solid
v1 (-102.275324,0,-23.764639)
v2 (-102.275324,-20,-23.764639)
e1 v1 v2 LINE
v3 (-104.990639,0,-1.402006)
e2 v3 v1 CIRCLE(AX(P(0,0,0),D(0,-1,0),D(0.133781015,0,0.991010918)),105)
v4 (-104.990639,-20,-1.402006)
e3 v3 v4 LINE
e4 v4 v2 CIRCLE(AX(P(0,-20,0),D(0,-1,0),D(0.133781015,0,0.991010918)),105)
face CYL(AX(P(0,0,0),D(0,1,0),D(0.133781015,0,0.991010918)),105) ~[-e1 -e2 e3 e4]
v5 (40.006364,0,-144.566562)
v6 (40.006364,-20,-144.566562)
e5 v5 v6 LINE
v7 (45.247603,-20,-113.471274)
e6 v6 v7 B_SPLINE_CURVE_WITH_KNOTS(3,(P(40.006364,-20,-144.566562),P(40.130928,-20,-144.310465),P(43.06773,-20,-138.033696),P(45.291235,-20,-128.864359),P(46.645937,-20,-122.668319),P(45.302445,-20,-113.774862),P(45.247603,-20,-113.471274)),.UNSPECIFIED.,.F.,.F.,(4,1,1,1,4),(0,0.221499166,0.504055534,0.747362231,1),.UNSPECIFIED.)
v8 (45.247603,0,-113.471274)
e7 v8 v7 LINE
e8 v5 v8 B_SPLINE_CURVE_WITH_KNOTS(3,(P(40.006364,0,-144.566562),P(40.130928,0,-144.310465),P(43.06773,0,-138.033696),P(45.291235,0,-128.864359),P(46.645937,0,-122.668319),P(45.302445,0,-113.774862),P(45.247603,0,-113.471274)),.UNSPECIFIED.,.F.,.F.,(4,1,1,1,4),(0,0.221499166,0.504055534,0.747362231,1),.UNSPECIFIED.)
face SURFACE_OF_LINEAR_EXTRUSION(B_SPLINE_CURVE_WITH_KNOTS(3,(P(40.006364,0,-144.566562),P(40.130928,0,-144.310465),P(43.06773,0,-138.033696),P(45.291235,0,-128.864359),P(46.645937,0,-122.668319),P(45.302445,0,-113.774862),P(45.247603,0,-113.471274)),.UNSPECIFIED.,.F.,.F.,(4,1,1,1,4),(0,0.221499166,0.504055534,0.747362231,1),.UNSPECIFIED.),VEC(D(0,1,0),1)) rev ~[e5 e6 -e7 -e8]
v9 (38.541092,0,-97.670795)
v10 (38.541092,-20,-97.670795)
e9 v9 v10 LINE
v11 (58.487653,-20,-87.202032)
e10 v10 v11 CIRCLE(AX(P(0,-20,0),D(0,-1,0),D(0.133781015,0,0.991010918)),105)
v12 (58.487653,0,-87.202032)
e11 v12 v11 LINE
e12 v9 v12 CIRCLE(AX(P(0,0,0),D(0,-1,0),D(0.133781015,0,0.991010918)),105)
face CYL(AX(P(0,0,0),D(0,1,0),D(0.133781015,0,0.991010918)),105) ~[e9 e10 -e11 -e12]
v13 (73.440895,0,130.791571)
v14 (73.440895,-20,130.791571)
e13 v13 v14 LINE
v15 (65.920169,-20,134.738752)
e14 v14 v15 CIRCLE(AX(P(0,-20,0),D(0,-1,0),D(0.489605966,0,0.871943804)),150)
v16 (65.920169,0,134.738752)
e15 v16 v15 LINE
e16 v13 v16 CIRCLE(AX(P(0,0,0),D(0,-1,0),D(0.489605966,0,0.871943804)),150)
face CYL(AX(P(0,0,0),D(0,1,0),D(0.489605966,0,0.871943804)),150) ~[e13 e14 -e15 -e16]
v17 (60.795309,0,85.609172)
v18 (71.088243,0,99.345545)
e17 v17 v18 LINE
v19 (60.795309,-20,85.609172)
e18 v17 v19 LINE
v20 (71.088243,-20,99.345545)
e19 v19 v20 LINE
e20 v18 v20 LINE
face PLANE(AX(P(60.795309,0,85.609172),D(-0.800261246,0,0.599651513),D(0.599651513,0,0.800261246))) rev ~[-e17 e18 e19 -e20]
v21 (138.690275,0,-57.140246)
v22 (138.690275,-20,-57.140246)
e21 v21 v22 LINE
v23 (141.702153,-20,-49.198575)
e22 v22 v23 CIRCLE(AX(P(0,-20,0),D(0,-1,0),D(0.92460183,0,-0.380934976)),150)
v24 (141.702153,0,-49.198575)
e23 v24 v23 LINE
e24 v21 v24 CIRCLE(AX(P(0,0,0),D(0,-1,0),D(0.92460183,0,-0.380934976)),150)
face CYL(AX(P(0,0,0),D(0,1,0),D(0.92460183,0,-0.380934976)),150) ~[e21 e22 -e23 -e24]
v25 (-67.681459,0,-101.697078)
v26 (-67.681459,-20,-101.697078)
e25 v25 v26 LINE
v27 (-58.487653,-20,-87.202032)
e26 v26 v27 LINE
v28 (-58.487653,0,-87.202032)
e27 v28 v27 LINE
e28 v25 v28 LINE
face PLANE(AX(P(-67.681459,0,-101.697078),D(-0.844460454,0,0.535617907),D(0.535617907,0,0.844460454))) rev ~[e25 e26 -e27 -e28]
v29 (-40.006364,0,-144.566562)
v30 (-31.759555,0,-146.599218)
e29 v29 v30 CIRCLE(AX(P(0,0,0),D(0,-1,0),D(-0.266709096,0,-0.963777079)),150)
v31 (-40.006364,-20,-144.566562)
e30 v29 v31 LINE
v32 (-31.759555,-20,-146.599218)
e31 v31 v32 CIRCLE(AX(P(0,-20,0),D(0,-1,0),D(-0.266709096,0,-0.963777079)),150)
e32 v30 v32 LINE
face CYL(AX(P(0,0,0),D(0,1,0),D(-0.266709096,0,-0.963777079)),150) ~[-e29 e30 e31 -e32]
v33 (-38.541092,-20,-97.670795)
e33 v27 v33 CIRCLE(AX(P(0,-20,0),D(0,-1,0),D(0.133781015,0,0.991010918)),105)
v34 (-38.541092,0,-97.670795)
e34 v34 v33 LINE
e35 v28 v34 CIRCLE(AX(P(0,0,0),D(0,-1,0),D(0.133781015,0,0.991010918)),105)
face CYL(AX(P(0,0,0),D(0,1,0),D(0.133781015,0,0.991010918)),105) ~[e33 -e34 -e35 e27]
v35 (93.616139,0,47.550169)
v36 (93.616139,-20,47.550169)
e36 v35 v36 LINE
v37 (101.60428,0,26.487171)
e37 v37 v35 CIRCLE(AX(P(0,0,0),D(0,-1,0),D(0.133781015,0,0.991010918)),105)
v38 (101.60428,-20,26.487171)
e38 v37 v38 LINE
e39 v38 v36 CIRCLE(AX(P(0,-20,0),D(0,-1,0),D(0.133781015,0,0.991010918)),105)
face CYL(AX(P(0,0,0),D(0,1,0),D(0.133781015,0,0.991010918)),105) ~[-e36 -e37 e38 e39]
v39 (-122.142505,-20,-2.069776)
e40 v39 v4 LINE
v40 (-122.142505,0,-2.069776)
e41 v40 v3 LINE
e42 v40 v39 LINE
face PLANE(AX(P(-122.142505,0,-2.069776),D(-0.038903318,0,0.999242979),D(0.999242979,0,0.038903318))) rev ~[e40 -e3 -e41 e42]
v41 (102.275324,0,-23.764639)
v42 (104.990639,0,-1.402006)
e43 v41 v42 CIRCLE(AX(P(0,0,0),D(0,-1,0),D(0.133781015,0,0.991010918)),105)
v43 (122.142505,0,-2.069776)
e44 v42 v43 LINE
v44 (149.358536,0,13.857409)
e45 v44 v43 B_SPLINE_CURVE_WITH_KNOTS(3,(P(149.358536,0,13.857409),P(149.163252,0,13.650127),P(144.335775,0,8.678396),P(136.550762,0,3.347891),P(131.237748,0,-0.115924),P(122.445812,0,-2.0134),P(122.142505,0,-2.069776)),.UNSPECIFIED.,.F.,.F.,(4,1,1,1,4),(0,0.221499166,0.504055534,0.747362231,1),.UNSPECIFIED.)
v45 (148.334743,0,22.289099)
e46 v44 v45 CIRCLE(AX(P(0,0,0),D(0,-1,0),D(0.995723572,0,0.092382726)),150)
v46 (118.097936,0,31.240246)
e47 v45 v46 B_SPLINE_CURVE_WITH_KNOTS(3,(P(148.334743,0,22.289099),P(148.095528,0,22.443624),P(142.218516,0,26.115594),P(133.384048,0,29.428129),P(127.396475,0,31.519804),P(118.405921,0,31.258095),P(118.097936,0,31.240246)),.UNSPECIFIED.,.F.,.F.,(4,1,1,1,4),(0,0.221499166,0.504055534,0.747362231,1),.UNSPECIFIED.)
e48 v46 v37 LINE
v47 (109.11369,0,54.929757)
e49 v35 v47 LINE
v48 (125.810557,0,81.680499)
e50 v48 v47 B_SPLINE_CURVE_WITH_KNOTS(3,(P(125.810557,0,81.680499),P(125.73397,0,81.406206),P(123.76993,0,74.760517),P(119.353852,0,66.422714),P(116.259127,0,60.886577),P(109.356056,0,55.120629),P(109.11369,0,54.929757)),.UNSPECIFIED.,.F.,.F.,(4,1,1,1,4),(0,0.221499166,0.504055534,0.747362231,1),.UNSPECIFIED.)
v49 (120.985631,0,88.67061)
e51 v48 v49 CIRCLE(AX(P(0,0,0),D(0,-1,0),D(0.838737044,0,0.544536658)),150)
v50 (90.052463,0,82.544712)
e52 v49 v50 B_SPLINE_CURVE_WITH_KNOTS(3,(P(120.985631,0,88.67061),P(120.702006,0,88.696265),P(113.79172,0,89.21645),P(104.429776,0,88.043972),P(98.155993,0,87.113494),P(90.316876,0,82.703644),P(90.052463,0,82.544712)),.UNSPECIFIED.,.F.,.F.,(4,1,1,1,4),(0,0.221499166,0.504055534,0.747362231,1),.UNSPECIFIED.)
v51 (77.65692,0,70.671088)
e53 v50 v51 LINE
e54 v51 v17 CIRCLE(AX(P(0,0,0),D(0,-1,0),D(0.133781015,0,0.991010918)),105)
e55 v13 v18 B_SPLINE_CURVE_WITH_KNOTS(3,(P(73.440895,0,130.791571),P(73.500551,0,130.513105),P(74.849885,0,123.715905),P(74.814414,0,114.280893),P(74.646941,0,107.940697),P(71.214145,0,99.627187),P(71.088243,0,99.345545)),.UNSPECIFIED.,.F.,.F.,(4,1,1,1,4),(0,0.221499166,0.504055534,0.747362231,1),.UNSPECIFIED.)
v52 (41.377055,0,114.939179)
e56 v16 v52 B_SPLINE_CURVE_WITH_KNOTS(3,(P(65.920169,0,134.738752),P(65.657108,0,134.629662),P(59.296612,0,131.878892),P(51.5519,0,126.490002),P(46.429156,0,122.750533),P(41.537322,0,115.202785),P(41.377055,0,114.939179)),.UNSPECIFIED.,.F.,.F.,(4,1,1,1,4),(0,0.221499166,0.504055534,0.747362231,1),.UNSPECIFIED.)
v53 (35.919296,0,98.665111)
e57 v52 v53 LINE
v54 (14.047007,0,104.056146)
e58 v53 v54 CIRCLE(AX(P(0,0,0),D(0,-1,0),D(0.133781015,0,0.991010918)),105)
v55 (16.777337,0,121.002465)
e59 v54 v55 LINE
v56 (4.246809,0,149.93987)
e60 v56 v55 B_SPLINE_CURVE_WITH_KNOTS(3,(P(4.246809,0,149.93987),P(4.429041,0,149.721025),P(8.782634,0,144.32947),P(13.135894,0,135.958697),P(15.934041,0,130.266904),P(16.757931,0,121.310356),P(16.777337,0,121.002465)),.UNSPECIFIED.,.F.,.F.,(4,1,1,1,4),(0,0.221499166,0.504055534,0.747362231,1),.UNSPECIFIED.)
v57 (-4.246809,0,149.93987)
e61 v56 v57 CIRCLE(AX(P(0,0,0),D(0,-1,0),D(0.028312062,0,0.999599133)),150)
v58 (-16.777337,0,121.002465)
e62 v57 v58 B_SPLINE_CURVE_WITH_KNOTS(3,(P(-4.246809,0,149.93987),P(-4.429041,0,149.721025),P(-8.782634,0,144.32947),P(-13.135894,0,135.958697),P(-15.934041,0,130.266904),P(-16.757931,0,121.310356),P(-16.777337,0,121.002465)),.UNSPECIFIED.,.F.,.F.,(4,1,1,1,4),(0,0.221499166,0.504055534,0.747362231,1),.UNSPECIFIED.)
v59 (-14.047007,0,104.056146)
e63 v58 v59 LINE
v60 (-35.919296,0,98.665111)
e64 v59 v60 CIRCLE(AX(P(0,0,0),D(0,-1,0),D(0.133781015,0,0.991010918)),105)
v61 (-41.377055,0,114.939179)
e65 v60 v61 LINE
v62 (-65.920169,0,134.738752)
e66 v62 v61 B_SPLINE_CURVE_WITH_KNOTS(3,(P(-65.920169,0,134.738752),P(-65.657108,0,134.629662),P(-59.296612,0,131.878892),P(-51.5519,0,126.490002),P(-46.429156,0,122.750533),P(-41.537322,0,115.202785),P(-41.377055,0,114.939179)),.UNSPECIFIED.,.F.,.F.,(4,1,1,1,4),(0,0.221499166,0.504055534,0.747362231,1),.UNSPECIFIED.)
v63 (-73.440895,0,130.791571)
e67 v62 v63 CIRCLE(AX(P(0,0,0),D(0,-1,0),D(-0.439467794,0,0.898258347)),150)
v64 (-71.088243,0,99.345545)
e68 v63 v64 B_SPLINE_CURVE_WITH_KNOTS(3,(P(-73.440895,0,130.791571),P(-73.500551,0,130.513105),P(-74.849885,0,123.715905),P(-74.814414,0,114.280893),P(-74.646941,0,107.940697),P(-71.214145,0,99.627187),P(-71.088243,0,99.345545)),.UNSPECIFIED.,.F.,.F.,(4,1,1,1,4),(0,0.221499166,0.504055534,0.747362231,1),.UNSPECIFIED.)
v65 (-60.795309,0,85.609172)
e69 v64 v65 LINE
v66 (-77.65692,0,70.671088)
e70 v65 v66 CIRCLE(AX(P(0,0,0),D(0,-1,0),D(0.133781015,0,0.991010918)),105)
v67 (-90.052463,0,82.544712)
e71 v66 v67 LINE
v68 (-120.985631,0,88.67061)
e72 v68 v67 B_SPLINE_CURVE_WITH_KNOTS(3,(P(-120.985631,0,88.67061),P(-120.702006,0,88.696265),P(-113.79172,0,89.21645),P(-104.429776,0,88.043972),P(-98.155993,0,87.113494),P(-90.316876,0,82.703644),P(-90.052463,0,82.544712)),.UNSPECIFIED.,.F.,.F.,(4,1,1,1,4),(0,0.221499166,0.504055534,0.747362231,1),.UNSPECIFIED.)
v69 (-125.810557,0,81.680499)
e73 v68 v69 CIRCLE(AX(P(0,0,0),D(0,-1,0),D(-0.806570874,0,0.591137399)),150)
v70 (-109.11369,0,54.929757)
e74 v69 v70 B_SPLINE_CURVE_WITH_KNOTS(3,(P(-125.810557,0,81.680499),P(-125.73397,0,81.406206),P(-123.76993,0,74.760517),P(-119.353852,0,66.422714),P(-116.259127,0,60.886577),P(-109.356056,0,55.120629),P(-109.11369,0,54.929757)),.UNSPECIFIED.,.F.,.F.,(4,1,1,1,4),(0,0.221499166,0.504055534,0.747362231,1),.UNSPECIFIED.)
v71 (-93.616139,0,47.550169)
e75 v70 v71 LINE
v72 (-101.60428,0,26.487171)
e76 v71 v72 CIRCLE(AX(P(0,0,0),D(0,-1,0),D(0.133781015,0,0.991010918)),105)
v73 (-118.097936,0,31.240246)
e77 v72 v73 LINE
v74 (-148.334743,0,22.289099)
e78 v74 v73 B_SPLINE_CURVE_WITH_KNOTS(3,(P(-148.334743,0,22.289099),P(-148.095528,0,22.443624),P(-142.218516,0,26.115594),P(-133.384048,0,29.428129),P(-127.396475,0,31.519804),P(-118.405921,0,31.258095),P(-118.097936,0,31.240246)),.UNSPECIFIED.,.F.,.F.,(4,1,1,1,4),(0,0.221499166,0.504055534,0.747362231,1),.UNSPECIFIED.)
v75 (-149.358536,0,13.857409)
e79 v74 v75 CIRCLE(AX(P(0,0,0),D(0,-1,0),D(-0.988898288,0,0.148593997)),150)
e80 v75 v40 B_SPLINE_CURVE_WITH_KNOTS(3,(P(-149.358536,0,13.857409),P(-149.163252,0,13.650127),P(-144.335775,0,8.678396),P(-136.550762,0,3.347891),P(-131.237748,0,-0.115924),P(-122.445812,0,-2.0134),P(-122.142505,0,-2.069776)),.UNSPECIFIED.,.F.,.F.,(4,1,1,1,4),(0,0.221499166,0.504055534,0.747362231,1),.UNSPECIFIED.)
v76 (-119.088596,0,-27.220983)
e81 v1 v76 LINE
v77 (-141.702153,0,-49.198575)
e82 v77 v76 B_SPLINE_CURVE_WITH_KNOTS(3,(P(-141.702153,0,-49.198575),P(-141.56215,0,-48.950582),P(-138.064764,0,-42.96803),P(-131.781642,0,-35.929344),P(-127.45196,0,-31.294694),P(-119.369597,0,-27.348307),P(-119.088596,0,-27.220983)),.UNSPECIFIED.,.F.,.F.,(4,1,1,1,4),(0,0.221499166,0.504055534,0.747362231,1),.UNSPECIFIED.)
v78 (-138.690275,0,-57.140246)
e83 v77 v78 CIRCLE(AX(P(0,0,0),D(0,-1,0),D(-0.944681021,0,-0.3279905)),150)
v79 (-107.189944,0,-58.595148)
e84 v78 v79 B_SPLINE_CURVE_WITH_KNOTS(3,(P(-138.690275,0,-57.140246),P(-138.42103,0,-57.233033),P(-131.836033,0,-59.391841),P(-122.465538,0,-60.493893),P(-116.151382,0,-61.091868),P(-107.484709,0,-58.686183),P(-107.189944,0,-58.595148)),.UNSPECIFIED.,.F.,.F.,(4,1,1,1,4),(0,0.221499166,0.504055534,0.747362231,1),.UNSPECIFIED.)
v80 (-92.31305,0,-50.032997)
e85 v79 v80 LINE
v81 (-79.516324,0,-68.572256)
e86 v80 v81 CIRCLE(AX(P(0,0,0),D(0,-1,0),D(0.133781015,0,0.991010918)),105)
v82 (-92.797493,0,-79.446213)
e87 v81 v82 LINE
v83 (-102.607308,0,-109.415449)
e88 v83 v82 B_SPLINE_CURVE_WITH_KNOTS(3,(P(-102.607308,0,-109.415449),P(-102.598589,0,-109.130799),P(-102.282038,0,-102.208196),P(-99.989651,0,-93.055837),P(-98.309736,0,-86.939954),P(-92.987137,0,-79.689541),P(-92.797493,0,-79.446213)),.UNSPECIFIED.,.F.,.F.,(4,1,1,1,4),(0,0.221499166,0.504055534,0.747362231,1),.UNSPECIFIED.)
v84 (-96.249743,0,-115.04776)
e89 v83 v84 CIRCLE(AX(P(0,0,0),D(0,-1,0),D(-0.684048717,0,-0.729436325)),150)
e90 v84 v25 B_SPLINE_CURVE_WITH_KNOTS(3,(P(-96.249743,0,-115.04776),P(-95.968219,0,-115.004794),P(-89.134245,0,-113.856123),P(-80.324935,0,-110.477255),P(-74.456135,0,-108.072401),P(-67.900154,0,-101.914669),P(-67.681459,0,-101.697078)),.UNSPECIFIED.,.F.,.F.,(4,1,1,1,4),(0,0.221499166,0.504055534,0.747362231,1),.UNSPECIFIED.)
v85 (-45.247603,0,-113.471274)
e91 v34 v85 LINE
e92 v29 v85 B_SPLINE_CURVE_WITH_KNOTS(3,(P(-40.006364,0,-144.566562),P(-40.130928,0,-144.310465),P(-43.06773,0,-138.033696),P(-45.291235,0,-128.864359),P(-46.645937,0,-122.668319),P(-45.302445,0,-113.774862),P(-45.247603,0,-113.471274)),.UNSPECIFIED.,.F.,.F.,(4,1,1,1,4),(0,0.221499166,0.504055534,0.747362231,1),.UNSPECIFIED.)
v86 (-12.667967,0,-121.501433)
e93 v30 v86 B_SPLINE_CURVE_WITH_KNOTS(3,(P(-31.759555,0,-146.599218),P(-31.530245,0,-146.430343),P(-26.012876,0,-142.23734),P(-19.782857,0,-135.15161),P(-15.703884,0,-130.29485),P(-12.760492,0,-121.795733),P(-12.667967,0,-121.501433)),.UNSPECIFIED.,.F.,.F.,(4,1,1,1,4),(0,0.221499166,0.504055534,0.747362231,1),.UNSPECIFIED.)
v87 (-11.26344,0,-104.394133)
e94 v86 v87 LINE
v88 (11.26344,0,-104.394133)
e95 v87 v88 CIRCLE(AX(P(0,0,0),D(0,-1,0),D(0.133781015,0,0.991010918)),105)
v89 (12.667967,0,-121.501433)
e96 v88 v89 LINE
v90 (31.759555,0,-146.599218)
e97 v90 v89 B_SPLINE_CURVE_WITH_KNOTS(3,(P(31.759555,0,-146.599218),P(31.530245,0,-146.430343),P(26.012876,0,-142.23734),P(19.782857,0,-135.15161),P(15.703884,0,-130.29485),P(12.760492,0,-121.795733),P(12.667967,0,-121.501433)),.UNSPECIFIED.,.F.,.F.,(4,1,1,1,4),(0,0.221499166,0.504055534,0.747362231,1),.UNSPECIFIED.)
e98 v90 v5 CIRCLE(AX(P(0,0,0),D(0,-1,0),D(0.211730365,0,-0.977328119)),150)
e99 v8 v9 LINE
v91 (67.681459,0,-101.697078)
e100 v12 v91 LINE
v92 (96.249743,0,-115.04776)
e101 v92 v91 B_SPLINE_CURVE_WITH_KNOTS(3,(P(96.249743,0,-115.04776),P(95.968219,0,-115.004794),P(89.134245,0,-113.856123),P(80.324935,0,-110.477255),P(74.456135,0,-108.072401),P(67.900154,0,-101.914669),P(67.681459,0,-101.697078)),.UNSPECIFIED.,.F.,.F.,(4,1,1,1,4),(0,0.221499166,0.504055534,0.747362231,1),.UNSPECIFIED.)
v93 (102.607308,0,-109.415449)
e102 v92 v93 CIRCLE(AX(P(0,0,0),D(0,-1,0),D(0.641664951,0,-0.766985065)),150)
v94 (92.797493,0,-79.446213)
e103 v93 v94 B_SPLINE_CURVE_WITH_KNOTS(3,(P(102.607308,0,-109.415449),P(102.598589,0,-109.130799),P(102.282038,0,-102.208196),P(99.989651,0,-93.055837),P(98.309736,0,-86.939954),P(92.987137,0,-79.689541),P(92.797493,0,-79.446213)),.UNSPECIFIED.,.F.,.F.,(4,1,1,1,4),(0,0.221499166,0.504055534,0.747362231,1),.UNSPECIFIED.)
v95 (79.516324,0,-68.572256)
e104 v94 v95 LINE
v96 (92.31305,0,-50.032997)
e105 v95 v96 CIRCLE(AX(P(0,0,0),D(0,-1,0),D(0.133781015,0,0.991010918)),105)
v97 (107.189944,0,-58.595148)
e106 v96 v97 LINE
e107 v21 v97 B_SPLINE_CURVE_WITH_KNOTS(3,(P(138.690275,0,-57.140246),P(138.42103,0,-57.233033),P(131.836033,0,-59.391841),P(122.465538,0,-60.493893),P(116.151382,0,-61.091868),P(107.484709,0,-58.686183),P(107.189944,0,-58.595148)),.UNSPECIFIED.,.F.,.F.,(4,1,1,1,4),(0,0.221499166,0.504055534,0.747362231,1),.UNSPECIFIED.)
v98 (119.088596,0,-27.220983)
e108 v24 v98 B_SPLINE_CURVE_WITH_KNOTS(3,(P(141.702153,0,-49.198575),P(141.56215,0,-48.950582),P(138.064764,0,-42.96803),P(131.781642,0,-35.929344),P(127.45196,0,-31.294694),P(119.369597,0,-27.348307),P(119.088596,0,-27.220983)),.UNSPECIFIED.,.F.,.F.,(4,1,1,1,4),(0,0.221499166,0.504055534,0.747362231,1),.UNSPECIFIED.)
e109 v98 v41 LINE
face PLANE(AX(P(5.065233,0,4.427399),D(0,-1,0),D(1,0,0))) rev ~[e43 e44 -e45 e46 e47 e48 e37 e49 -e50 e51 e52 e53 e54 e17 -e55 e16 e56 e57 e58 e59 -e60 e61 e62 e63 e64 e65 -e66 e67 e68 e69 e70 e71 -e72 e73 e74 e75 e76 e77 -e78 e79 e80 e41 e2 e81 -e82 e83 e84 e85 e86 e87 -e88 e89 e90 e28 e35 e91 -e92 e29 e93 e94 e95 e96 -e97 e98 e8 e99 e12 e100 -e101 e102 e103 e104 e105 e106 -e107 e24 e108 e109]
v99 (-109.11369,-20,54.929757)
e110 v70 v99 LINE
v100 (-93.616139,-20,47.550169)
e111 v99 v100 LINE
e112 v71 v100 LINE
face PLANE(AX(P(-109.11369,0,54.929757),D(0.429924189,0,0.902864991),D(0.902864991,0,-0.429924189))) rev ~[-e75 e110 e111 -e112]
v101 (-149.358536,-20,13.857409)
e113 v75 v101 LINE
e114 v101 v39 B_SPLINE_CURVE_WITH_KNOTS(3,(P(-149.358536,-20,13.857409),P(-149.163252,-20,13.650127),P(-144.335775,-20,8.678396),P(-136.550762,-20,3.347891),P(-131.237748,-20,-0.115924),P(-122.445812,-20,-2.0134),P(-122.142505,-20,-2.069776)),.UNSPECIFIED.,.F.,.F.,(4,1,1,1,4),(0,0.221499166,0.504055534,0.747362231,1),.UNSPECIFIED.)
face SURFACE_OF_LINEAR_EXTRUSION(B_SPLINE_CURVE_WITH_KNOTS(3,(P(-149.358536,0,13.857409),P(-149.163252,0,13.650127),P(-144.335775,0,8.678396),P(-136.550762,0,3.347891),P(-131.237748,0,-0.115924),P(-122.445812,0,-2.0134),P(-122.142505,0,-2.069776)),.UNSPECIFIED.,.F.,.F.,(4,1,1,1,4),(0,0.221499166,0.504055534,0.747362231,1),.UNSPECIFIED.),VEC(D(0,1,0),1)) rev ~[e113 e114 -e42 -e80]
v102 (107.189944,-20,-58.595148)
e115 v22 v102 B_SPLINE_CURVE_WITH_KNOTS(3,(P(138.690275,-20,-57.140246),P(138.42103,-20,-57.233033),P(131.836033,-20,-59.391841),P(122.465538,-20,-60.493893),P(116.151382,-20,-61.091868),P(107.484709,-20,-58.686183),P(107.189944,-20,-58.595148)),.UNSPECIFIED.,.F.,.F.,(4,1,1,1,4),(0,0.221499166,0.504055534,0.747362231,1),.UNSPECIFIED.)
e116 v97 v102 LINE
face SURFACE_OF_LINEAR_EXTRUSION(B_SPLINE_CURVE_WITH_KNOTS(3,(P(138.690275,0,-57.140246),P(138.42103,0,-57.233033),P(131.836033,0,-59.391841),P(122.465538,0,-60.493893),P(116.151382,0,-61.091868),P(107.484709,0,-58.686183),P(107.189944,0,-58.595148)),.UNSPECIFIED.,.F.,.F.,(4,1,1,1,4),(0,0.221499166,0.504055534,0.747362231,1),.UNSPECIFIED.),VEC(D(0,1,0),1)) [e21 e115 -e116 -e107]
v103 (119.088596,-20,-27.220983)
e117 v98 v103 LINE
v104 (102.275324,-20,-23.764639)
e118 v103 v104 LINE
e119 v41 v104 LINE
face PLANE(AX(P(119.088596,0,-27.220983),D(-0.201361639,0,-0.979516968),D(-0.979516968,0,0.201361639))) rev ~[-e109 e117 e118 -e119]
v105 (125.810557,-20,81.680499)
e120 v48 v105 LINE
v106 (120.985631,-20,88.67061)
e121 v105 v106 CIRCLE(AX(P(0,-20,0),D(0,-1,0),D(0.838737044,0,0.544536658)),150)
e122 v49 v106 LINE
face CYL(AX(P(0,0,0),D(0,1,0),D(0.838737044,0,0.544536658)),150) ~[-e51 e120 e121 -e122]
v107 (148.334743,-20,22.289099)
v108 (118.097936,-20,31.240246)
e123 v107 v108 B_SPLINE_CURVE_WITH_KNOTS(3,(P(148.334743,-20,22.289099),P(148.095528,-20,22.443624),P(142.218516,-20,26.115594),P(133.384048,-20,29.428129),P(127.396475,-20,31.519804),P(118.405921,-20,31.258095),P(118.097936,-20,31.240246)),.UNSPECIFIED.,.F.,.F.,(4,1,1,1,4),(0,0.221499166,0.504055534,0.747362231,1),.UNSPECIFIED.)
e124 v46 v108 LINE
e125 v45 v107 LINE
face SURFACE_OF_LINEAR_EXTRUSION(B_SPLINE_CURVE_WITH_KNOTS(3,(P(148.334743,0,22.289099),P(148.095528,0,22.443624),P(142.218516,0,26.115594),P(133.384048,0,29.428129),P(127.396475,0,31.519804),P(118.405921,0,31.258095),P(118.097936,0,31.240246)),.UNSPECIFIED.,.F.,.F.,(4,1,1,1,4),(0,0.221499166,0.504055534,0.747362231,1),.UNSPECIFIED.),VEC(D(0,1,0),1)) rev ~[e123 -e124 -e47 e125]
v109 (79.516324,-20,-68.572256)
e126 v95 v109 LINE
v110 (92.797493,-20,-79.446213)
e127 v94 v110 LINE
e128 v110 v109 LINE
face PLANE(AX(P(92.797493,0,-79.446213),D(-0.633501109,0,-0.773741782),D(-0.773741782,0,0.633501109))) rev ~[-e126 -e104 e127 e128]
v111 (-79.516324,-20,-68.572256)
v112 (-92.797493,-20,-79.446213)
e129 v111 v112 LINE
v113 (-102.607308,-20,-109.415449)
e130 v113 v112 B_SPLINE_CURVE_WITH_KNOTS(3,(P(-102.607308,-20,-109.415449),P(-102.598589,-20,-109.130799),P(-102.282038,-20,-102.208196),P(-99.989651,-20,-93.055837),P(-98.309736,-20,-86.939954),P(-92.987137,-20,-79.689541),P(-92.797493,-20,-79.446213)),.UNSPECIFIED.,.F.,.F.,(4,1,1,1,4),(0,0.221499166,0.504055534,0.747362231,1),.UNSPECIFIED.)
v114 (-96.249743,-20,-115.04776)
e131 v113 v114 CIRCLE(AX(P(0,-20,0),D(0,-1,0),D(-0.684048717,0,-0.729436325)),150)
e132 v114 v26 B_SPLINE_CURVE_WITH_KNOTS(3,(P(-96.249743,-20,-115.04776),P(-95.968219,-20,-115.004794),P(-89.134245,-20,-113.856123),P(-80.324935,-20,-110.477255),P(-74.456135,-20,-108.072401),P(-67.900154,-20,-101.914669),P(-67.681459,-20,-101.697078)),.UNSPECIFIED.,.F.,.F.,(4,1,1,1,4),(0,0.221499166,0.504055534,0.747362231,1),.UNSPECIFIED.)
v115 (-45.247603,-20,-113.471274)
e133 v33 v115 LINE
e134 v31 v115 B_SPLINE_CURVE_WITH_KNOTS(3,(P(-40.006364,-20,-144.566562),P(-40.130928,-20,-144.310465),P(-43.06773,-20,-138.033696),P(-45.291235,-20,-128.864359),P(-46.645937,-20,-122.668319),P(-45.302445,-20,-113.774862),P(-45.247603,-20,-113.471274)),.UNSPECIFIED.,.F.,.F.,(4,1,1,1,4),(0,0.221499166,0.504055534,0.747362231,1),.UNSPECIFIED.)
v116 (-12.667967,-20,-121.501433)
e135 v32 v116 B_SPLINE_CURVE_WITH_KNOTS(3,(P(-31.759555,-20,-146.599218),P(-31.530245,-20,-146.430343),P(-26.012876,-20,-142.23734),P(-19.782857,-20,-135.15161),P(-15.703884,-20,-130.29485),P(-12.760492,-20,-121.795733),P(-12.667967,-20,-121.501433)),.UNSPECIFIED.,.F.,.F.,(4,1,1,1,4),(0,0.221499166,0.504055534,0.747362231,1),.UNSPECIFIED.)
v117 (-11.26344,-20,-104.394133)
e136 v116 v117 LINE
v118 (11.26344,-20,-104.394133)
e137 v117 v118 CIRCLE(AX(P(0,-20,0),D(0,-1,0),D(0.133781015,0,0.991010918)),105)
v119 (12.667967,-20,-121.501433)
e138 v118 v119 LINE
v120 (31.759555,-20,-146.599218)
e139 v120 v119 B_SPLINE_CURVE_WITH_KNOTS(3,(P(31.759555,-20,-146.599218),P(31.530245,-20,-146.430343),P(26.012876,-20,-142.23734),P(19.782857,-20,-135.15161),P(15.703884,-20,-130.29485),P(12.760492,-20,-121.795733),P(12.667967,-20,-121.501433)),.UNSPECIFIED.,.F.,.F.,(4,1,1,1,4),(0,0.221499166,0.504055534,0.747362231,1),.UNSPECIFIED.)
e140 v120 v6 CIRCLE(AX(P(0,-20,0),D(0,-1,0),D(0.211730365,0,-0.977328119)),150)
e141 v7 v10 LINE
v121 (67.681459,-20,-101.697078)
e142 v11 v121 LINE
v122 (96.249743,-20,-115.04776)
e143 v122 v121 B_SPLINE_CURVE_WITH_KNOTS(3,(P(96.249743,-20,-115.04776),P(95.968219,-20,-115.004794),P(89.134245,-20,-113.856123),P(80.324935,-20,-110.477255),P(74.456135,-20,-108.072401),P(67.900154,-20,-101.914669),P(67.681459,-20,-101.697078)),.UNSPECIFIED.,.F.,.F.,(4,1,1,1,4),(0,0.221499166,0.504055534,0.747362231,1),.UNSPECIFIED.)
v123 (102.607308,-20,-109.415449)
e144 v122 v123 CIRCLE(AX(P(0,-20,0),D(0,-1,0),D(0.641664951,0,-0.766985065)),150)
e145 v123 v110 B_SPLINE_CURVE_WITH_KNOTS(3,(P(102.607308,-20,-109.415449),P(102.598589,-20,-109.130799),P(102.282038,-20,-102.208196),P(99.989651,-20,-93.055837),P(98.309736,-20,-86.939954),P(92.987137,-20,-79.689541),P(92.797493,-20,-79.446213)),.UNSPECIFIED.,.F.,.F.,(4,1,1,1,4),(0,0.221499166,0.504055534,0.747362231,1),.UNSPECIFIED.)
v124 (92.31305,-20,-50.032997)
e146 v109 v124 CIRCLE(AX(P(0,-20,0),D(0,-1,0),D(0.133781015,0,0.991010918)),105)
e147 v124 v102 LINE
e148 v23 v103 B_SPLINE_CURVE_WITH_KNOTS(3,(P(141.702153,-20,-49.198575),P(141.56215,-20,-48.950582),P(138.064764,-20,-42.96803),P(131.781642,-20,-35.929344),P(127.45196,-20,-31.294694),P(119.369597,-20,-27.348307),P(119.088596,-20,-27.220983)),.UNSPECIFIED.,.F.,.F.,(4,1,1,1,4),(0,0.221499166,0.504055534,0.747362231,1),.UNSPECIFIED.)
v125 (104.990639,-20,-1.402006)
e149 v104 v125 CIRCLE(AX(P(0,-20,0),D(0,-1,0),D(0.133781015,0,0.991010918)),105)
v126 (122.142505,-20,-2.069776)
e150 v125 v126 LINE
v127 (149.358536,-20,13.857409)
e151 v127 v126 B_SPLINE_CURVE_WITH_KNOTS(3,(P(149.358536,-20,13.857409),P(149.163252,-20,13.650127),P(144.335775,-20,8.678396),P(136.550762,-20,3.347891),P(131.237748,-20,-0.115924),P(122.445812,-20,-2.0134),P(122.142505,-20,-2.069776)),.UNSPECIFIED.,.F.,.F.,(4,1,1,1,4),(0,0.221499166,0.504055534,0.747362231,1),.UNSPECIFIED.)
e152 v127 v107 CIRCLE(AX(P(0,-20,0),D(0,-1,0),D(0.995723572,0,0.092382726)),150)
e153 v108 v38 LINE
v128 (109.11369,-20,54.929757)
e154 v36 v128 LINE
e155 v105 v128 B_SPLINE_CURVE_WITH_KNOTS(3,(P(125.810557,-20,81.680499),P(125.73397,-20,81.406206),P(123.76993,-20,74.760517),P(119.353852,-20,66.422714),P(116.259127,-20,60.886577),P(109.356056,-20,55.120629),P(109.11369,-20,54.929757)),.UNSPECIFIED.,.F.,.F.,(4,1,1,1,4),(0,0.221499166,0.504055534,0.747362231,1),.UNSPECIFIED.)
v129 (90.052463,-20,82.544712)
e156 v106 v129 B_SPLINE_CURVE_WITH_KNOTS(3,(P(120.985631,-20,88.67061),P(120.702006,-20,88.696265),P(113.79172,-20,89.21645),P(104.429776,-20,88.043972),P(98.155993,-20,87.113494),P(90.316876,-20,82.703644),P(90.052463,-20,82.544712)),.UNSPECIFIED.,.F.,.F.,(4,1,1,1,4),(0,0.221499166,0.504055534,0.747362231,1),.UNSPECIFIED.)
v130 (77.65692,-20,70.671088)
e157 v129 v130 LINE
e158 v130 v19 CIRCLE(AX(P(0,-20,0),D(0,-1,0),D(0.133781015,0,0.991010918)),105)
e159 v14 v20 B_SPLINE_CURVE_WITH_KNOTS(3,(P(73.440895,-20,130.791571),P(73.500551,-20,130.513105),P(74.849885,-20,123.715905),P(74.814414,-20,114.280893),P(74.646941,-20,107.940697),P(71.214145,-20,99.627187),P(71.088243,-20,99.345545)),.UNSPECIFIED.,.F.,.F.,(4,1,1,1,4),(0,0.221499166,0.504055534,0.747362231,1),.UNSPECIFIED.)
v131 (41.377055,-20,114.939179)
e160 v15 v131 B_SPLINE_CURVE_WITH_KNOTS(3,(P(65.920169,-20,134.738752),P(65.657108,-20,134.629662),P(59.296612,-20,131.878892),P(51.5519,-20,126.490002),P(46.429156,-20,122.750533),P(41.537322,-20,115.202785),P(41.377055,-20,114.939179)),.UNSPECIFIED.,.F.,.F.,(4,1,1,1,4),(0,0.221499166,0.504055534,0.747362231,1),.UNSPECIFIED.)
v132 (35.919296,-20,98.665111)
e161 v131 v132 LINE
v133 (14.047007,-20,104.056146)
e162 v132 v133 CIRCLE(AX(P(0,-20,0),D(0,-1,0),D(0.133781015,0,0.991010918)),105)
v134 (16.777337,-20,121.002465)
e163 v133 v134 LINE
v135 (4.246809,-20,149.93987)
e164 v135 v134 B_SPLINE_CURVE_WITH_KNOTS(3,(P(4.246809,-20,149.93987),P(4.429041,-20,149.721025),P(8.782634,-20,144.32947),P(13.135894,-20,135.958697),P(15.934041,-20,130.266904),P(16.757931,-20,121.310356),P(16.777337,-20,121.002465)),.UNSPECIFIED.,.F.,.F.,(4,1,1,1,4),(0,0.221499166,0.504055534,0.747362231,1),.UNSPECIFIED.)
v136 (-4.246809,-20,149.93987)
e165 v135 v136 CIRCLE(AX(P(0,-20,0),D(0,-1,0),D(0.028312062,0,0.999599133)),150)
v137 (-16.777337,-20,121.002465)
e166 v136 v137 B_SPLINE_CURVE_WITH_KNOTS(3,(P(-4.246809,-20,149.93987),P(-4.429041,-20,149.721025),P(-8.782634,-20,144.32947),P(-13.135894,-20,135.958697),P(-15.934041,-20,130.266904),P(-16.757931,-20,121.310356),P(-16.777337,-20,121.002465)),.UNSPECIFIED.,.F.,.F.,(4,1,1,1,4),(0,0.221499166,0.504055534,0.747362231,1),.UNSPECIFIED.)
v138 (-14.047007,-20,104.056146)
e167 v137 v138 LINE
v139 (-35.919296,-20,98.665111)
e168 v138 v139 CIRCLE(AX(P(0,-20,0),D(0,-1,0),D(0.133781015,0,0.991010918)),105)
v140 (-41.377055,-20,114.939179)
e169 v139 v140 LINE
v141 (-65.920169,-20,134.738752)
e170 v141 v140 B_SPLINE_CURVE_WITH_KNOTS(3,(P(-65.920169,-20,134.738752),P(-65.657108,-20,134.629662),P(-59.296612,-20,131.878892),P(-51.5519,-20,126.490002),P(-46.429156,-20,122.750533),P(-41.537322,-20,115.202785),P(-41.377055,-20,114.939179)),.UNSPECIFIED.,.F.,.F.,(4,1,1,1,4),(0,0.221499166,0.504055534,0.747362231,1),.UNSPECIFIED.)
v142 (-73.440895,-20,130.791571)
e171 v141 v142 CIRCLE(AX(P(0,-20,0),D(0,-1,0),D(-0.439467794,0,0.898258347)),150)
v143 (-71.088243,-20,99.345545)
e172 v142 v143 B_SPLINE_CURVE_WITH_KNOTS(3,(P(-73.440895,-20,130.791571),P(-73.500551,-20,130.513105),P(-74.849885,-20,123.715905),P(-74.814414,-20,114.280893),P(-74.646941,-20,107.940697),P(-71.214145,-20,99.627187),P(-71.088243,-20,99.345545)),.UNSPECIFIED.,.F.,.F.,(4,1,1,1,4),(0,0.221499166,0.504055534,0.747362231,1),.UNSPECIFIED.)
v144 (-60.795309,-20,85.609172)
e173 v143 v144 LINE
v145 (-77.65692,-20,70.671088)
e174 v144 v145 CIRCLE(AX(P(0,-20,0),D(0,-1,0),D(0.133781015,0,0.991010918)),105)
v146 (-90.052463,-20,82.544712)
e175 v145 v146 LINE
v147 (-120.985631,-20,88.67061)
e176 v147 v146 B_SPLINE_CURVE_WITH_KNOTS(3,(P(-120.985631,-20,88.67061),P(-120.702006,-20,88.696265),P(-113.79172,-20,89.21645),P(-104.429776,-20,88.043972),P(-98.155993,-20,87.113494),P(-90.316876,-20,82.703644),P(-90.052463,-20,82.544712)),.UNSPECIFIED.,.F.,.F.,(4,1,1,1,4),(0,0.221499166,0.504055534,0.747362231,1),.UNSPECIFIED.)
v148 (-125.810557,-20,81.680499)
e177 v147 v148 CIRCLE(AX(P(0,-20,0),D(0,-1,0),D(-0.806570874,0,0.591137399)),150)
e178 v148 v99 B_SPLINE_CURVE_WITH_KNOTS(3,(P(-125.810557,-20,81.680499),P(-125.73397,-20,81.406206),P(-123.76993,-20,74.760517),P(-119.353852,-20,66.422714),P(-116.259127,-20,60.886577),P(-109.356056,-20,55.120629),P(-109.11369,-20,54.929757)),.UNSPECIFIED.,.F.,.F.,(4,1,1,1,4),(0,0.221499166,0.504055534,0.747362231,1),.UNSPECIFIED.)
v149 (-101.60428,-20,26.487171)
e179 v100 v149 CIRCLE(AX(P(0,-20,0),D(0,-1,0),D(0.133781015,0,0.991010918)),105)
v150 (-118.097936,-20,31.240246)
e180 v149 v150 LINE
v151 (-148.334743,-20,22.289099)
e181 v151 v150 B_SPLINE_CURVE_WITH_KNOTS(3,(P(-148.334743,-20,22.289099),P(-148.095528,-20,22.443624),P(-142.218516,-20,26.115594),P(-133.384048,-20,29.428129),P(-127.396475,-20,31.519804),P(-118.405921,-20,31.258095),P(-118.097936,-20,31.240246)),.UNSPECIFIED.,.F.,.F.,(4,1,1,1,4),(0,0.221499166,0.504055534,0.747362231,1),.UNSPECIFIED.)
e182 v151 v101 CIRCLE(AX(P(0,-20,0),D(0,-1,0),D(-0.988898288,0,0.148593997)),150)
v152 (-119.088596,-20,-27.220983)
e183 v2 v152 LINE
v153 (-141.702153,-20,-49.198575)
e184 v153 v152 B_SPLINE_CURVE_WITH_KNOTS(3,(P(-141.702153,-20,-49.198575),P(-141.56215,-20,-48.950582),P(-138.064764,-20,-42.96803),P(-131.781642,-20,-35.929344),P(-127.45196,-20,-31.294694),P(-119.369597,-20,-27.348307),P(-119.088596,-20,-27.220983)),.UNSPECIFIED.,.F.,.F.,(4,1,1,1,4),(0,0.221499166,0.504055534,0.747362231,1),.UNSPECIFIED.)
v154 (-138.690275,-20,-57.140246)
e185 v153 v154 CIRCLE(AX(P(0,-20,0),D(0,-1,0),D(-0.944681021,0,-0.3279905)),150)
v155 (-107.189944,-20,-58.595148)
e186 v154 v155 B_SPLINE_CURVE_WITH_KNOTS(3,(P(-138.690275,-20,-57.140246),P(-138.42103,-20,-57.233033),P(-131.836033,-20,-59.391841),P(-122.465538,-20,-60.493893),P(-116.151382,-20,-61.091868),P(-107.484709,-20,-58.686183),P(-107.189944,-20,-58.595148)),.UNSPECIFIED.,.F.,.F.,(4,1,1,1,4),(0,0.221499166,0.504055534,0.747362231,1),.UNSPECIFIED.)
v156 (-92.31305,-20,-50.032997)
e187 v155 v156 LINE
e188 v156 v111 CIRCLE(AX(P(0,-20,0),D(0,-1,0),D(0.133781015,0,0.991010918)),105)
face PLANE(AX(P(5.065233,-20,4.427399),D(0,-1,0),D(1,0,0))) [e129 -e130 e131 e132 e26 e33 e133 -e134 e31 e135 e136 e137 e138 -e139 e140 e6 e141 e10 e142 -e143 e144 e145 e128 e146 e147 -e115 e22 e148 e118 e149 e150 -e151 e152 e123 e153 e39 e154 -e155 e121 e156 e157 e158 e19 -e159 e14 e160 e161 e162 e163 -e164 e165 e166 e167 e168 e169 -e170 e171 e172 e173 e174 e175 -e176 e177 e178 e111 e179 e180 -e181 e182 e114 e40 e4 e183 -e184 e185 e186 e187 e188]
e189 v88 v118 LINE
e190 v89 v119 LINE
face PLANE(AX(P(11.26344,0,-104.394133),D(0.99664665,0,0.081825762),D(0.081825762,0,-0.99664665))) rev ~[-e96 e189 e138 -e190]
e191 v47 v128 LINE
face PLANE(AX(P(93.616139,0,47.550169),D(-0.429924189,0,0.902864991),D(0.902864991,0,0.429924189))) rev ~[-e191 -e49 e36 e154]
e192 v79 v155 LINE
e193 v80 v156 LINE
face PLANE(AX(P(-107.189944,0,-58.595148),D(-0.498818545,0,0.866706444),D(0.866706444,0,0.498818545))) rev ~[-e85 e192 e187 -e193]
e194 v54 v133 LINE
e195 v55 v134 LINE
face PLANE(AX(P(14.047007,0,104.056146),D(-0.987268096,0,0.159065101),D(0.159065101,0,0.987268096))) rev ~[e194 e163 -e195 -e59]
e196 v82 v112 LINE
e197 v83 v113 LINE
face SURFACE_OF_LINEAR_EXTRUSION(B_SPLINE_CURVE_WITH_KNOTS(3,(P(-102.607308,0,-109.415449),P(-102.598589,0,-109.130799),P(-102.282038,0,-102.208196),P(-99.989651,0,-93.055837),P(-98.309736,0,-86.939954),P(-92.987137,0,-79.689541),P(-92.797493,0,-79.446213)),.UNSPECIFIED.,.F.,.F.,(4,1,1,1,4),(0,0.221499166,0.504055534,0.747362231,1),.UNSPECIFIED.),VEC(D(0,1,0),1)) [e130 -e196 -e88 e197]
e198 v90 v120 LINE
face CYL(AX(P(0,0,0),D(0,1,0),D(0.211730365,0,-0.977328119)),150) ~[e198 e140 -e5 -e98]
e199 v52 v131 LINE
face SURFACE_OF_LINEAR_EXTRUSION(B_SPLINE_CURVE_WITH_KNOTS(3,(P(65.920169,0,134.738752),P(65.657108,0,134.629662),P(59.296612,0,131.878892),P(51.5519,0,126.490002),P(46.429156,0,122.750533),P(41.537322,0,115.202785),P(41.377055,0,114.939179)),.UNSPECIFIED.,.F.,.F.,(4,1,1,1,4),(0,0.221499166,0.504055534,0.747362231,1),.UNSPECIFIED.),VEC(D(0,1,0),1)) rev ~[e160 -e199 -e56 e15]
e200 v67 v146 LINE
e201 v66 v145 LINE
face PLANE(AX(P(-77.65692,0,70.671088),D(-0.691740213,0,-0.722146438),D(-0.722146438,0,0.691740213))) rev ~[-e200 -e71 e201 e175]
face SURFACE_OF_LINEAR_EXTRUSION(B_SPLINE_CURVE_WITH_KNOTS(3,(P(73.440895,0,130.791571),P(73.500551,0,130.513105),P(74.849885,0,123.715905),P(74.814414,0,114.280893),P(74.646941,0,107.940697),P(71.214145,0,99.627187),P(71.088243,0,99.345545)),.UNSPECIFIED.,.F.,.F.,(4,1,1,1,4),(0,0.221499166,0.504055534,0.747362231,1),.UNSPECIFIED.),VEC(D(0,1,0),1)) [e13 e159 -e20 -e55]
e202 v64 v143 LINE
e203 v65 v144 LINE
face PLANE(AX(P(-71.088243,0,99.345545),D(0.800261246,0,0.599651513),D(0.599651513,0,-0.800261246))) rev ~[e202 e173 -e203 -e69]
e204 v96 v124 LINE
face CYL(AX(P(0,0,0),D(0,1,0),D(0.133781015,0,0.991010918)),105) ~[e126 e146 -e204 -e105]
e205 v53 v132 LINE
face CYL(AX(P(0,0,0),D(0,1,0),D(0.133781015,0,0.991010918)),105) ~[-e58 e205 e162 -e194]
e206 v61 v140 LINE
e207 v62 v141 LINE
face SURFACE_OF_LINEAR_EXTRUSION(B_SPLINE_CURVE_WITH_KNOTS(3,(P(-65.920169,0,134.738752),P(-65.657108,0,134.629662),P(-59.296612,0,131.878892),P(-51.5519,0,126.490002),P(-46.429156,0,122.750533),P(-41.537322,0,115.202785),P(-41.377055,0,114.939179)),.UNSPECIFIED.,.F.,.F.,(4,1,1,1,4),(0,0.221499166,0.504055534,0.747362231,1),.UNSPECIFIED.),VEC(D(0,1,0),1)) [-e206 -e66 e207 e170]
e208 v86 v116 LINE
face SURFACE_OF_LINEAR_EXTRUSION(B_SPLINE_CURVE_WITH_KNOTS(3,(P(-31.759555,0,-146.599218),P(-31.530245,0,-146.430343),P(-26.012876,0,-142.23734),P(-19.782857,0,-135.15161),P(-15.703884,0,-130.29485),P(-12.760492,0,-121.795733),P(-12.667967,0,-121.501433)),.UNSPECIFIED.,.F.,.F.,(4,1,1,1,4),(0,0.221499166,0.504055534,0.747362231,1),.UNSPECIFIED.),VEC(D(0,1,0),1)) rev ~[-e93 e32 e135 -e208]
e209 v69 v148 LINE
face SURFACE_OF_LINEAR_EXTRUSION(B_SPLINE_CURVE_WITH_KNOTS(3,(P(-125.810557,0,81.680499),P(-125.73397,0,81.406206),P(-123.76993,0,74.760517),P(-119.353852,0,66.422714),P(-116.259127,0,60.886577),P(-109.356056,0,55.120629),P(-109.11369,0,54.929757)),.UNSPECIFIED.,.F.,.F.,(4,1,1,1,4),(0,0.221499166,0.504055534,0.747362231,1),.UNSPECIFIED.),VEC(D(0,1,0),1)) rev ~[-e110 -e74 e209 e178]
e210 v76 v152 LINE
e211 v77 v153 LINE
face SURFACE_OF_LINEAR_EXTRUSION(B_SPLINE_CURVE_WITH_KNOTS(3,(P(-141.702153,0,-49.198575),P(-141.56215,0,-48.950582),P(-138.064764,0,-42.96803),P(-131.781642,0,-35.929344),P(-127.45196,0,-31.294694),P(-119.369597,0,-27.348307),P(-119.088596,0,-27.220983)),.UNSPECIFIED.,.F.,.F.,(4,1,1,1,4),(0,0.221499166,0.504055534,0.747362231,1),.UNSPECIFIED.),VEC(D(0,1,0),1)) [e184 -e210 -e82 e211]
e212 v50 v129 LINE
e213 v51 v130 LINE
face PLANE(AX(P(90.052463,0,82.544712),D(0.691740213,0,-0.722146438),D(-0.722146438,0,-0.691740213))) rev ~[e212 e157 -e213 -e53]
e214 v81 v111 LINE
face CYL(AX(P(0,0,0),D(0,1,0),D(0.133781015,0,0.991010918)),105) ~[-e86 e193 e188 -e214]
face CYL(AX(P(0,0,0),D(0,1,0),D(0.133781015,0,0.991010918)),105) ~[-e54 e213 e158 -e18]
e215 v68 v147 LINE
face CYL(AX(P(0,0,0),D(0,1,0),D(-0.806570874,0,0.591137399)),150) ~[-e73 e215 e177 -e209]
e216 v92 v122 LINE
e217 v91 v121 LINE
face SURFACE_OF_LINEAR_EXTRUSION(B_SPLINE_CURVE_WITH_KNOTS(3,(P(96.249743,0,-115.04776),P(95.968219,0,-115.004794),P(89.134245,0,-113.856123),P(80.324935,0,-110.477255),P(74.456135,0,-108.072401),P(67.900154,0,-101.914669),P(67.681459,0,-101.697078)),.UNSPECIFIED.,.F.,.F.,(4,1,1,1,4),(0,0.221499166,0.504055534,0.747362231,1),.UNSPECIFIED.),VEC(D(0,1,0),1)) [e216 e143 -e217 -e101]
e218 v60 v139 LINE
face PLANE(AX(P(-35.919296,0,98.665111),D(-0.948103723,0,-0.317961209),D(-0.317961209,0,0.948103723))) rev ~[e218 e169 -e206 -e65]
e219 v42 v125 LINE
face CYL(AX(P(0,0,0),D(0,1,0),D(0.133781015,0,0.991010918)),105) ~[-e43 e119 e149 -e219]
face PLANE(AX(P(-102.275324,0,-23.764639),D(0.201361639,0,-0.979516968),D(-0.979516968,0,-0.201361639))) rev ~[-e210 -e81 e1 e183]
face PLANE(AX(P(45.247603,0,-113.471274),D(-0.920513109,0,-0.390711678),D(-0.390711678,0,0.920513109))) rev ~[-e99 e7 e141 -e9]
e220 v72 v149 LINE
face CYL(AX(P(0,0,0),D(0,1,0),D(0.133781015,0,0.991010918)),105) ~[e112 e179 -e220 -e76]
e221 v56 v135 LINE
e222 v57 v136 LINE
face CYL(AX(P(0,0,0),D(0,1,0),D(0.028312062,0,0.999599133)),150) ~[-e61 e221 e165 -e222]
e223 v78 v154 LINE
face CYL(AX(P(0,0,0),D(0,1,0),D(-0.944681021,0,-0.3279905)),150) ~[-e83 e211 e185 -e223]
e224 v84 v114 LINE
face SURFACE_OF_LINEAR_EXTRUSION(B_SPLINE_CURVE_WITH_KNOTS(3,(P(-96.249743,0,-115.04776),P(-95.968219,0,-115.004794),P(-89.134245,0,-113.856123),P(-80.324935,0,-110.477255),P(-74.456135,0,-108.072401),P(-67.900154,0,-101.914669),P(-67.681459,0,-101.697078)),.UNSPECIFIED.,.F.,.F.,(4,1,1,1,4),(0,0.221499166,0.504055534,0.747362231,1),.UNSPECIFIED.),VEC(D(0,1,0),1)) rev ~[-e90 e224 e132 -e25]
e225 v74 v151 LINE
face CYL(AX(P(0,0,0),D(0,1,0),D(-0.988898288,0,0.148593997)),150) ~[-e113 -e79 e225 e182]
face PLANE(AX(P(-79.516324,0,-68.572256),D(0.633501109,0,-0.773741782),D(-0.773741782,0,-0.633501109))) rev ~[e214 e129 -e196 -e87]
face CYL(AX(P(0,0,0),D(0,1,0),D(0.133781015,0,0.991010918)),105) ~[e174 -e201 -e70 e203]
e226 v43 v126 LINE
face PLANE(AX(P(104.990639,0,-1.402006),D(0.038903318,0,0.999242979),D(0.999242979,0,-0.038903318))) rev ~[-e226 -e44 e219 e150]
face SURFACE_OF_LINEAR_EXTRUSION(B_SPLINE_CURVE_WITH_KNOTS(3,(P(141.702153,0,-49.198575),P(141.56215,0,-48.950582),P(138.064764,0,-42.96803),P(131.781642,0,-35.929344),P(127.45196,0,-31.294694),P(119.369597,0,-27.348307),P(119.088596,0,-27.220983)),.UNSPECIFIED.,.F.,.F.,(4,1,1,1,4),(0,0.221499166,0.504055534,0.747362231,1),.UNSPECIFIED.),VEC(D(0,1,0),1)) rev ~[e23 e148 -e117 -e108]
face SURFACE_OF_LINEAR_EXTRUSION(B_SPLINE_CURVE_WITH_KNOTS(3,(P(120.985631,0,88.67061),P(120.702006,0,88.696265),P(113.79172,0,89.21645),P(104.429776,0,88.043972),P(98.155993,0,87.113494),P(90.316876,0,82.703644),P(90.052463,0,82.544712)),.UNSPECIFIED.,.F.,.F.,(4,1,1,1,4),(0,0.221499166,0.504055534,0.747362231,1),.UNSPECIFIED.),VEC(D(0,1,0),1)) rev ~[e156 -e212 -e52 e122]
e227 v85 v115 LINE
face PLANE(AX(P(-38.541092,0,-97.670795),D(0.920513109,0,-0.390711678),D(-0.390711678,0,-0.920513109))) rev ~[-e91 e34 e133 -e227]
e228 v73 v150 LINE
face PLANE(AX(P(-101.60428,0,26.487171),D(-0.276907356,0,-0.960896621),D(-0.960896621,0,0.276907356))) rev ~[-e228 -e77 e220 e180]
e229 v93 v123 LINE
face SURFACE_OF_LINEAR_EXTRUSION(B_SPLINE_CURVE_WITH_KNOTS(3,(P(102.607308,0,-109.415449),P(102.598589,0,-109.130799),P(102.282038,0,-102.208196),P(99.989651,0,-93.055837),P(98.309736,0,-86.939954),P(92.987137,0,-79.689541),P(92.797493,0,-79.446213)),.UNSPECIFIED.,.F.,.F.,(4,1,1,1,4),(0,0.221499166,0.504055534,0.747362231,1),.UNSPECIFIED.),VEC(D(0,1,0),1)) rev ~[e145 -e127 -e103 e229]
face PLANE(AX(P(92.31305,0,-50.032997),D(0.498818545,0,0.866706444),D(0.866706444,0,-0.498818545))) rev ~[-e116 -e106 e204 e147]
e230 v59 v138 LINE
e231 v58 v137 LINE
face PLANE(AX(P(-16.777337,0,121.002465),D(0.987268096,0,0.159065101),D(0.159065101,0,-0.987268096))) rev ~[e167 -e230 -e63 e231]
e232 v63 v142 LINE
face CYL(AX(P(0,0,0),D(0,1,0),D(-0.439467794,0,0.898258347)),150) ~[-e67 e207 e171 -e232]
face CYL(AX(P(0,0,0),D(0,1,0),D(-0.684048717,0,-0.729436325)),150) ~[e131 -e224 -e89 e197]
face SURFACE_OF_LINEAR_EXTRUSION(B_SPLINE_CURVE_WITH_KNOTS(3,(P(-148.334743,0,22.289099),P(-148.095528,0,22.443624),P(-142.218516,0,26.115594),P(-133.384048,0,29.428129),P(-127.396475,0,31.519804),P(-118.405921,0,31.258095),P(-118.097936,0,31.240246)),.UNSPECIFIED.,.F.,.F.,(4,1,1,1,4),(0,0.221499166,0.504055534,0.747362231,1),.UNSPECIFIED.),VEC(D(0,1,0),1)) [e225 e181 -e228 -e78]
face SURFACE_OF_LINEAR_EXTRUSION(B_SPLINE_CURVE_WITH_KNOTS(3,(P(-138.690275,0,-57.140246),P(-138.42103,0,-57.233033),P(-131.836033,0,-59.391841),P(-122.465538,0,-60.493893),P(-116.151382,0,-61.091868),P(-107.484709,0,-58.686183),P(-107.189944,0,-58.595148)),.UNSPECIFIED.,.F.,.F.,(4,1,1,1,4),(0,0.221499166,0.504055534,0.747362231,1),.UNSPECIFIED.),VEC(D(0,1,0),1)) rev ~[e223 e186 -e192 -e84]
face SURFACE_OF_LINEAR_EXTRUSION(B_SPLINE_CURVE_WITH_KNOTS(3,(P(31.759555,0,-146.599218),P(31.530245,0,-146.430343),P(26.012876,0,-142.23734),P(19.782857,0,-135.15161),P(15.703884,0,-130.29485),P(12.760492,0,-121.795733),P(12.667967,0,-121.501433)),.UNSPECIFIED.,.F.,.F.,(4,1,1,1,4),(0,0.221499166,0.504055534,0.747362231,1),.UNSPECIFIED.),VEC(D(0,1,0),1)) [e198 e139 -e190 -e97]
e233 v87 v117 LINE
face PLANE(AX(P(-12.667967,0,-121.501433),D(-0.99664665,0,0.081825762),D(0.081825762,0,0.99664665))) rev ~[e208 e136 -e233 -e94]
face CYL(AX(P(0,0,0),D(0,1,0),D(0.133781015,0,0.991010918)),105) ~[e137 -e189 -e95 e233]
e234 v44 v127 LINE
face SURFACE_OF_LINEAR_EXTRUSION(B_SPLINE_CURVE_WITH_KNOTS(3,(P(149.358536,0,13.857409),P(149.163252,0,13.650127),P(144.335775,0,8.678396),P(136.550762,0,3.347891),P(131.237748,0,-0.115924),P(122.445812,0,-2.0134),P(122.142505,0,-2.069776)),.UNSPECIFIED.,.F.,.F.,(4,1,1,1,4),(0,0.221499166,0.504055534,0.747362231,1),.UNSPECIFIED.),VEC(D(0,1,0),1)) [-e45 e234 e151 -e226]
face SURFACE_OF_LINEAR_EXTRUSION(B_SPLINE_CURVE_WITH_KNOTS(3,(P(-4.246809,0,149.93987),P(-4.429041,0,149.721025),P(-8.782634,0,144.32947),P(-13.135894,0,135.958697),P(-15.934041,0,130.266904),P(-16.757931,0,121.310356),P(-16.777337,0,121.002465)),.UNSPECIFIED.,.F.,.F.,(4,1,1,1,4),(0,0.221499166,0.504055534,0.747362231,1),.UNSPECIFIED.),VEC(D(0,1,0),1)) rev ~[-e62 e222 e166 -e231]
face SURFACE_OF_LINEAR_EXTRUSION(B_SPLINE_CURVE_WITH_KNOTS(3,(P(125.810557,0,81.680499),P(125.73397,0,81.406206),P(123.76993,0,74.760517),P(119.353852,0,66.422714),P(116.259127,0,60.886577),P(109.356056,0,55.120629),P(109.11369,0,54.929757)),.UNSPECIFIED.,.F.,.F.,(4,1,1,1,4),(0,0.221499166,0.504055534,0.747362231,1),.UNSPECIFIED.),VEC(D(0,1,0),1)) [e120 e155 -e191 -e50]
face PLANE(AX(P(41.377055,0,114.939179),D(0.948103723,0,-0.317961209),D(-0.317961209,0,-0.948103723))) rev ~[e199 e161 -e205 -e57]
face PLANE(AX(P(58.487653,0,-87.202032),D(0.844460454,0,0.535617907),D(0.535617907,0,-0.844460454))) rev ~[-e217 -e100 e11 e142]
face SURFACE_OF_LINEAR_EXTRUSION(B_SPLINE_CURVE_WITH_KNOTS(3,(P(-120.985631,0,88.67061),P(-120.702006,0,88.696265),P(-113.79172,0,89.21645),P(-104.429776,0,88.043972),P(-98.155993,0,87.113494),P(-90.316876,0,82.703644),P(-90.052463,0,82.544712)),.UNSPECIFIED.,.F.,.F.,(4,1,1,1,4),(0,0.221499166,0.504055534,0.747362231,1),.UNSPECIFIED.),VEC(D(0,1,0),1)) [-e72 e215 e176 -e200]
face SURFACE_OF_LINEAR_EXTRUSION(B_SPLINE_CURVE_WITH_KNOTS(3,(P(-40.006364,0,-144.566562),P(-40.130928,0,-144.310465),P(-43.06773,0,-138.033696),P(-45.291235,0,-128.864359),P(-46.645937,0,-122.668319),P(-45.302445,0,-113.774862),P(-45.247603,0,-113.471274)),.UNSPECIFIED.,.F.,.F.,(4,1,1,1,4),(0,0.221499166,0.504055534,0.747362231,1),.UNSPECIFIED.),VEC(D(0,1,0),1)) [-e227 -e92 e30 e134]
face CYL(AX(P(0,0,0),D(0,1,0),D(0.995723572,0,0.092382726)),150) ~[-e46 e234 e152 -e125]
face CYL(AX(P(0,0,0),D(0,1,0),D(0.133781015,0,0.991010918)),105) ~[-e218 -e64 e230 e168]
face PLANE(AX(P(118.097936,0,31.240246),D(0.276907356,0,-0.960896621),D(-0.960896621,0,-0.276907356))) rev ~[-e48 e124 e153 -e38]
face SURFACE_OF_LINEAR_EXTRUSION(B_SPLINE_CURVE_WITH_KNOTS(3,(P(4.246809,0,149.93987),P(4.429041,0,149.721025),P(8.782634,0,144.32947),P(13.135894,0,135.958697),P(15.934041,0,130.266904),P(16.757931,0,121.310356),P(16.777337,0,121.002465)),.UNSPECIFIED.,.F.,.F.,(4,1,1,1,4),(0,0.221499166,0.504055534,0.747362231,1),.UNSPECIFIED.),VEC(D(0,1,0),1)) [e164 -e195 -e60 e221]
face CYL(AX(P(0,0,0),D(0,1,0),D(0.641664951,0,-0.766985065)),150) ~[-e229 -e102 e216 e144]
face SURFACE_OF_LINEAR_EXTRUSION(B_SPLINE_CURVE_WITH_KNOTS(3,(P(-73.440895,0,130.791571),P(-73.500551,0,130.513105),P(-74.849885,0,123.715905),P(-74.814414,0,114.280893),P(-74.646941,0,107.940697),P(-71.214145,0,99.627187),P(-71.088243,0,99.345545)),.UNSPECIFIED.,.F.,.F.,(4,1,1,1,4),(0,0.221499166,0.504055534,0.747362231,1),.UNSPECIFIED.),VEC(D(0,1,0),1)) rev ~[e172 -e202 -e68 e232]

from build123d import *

# Parameters (mm, degrees)
F2_DEPTH        = 20
F2_COPIES_COUNT = 13
F4_DEPTH        = 20


# Not quite as in the source:
# - a pattern or mirror of a feature is missing from the dataset's text; its kind, count and spacing are read off the source's solid


with BuildPart() as f2:
    # F1 (on Front) → F2 (new body)
    with BuildSketch(Plane.XZ):
        with BuildLine():
            ThreePointArc((-14.0470065876, 104.0561464111), (0, 105), (14.0470065876, 104.0561464111))
            Line((14.0470065876, 104.0561464111), (16.7773367506, 121.0024649167))
            add(Edge.make_bspline(
                [(4.2468093523, 149.9398699824), (4.4290412164, 149.7210246606), (8.7826343305, 144.3294696938), (13.1358942294, 135.9586969958), (15.9340407786, 130.266903883), (16.7579313288, 121.3103558316), (16.7773367506, 121.0024649167)],
                knots=[0, 0, 0, 0, 0.2214991664, 0.5040555337, 0.7473622312, 1, 1, 1, 1], degree=3))
            ThreePointArc((4.2468093523, 149.9398699824), (0, 150), (-4.2468093523, 149.9398699824))
            add(Edge.make_bspline(
                [(-4.2468093523, 149.9398699824), (-4.4290412164, 149.7210246606), (-8.7826343305, 144.3294696938), (-13.1358942294, 135.9586969958), (-15.9340407786, 130.266903883), (-16.7579313288, 121.3103558316), (-16.7773367506, 121.0024649167)],
                knots=[0, 0, 0, 0, 0.2214991664, 0.5040555337, 0.7473622312, 1, 1, 1, 1], degree=3))
            Line((-16.7773367506, 121.0024649167), (-14.0470065876, 104.0561464111))
        make_face()
    extrude(amount=F2_DEPTH)


with BuildPart() as f2_copies_1:
    # F2_copies: instance of F2
    add(f2.part.rotate(Axis((0, 0, 0), (0, 1, 0)), 1 * 360 / F2_COPIES_COUNT))


with BuildPart() as f2_copies_2:
    # F2_copies: instance of F2
    add(f2.part.rotate(Axis((0, 0, 0), (0, 1, 0)), 2 * 360 / F2_COPIES_COUNT))


with BuildPart() as f2_copies_3:
    # F2_copies: instance of F2
    add(f2.part.rotate(Axis((0, 0, 0), (0, 1, 0)), 3 * 360 / F2_COPIES_COUNT))


with BuildPart() as f2_copies_4:
    # F2_copies: instance of F2
    add(f2.part.rotate(Axis((0, 0, 0), (0, 1, 0)), 4 * 360 / F2_COPIES_COUNT))


with BuildPart() as f2_copies_5:
    # F2_copies: instance of F2
    add(f2.part.rotate(Axis((0, 0, 0), (0, 1, 0)), 5 * 360 / F2_COPIES_COUNT))


with BuildPart() as f2_copies_6:
    # F2_copies: instance of F2
    add(f2.part.rotate(Axis((0, 0, 0), (0, 1, 0)), 6 * 360 / F2_COPIES_COUNT))


with BuildPart() as f2_copies_7:
    # F2_copies: instance of F2
    add(f2.part.rotate(Axis((0, 0, 0), (0, 1, 0)), 7 * 360 / F2_COPIES_COUNT))


with BuildPart() as f2_copies_8:
    # F2_copies: instance of F2
    add(f2.part.rotate(Axis((0, 0, 0), (0, 1, 0)), 8 * 360 / F2_COPIES_COUNT))


with BuildPart() as f2_copies_9:
    # F2_copies: instance of F2
    add(f2.part.rotate(Axis((0, 0, 0), (0, 1, 0)), 9 * 360 / F2_COPIES_COUNT))


with BuildPart() as f2_copies_10:
    # F2_copies: instance of F2
    add(f2.part.rotate(Axis((0, 0, 0), (0, 1, 0)), 10 * 360 / F2_COPIES_COUNT))


with BuildPart() as f2_copies_11:
    # F2_copies: instance of F2
    add(f2.part.rotate(Axis((0, 0, 0), (0, 1, 0)), 11 * 360 / F2_COPIES_COUNT))


with BuildPart() as f2_copies_12:
    # F2_copies: instance of F2
    add(f2.part.rotate(Axis((0, 0, 0), (0, 1, 0)), 12 * 360 / F2_COPIES_COUNT))


with BuildPart() as f2_1:
    add(f2.part)

    add(f2_copies_1.part)  # F4 merges F2_copies_1

    add(f2_copies_2.part)  # F4 merges F2_copies_2

    add(f2_copies_3.part)  # F4 merges F2_copies_3

    add(f2_copies_4.part)  # F4 merges F2_copies_4

    add(f2_copies_5.part)  # F4 merges F2_copies_5

    add(f2_copies_6.part)  # F4 merges F2_copies_6

    add(f2_copies_7.part)  # F4 merges F2_copies_7

    add(f2_copies_8.part)  # F4 merges F2_copies_8

    add(f2_copies_9.part)  # F4 merges F2_copies_9

    add(f2_copies_10.part)  # F4 merges F2_copies_10

    add(f2_copies_11.part)  # F4 merges F2_copies_11

    add(f2_copies_12.part)  # F4 merges F2_copies_12
    # F1 (on Front) → F4 (join)
    with BuildSketch(Plane.XZ):
        with BuildLine():
            ThreePointArc((-14.0470065876, 104.0561464111), (-69.1016074643, -79.0567381432), (105, 0))
            ThreePointArc((105, 0), (79.0567381432, 69.1016074643), (14.0470065876, 104.0561464111))
            ThreePointArc((14.0470065876, 104.0561464111), (0, 105), (-14.0470065876, 104.0561464111))
        make_face()
    extrude(amount=F4_DEPTH)


solid = f2_1.part
